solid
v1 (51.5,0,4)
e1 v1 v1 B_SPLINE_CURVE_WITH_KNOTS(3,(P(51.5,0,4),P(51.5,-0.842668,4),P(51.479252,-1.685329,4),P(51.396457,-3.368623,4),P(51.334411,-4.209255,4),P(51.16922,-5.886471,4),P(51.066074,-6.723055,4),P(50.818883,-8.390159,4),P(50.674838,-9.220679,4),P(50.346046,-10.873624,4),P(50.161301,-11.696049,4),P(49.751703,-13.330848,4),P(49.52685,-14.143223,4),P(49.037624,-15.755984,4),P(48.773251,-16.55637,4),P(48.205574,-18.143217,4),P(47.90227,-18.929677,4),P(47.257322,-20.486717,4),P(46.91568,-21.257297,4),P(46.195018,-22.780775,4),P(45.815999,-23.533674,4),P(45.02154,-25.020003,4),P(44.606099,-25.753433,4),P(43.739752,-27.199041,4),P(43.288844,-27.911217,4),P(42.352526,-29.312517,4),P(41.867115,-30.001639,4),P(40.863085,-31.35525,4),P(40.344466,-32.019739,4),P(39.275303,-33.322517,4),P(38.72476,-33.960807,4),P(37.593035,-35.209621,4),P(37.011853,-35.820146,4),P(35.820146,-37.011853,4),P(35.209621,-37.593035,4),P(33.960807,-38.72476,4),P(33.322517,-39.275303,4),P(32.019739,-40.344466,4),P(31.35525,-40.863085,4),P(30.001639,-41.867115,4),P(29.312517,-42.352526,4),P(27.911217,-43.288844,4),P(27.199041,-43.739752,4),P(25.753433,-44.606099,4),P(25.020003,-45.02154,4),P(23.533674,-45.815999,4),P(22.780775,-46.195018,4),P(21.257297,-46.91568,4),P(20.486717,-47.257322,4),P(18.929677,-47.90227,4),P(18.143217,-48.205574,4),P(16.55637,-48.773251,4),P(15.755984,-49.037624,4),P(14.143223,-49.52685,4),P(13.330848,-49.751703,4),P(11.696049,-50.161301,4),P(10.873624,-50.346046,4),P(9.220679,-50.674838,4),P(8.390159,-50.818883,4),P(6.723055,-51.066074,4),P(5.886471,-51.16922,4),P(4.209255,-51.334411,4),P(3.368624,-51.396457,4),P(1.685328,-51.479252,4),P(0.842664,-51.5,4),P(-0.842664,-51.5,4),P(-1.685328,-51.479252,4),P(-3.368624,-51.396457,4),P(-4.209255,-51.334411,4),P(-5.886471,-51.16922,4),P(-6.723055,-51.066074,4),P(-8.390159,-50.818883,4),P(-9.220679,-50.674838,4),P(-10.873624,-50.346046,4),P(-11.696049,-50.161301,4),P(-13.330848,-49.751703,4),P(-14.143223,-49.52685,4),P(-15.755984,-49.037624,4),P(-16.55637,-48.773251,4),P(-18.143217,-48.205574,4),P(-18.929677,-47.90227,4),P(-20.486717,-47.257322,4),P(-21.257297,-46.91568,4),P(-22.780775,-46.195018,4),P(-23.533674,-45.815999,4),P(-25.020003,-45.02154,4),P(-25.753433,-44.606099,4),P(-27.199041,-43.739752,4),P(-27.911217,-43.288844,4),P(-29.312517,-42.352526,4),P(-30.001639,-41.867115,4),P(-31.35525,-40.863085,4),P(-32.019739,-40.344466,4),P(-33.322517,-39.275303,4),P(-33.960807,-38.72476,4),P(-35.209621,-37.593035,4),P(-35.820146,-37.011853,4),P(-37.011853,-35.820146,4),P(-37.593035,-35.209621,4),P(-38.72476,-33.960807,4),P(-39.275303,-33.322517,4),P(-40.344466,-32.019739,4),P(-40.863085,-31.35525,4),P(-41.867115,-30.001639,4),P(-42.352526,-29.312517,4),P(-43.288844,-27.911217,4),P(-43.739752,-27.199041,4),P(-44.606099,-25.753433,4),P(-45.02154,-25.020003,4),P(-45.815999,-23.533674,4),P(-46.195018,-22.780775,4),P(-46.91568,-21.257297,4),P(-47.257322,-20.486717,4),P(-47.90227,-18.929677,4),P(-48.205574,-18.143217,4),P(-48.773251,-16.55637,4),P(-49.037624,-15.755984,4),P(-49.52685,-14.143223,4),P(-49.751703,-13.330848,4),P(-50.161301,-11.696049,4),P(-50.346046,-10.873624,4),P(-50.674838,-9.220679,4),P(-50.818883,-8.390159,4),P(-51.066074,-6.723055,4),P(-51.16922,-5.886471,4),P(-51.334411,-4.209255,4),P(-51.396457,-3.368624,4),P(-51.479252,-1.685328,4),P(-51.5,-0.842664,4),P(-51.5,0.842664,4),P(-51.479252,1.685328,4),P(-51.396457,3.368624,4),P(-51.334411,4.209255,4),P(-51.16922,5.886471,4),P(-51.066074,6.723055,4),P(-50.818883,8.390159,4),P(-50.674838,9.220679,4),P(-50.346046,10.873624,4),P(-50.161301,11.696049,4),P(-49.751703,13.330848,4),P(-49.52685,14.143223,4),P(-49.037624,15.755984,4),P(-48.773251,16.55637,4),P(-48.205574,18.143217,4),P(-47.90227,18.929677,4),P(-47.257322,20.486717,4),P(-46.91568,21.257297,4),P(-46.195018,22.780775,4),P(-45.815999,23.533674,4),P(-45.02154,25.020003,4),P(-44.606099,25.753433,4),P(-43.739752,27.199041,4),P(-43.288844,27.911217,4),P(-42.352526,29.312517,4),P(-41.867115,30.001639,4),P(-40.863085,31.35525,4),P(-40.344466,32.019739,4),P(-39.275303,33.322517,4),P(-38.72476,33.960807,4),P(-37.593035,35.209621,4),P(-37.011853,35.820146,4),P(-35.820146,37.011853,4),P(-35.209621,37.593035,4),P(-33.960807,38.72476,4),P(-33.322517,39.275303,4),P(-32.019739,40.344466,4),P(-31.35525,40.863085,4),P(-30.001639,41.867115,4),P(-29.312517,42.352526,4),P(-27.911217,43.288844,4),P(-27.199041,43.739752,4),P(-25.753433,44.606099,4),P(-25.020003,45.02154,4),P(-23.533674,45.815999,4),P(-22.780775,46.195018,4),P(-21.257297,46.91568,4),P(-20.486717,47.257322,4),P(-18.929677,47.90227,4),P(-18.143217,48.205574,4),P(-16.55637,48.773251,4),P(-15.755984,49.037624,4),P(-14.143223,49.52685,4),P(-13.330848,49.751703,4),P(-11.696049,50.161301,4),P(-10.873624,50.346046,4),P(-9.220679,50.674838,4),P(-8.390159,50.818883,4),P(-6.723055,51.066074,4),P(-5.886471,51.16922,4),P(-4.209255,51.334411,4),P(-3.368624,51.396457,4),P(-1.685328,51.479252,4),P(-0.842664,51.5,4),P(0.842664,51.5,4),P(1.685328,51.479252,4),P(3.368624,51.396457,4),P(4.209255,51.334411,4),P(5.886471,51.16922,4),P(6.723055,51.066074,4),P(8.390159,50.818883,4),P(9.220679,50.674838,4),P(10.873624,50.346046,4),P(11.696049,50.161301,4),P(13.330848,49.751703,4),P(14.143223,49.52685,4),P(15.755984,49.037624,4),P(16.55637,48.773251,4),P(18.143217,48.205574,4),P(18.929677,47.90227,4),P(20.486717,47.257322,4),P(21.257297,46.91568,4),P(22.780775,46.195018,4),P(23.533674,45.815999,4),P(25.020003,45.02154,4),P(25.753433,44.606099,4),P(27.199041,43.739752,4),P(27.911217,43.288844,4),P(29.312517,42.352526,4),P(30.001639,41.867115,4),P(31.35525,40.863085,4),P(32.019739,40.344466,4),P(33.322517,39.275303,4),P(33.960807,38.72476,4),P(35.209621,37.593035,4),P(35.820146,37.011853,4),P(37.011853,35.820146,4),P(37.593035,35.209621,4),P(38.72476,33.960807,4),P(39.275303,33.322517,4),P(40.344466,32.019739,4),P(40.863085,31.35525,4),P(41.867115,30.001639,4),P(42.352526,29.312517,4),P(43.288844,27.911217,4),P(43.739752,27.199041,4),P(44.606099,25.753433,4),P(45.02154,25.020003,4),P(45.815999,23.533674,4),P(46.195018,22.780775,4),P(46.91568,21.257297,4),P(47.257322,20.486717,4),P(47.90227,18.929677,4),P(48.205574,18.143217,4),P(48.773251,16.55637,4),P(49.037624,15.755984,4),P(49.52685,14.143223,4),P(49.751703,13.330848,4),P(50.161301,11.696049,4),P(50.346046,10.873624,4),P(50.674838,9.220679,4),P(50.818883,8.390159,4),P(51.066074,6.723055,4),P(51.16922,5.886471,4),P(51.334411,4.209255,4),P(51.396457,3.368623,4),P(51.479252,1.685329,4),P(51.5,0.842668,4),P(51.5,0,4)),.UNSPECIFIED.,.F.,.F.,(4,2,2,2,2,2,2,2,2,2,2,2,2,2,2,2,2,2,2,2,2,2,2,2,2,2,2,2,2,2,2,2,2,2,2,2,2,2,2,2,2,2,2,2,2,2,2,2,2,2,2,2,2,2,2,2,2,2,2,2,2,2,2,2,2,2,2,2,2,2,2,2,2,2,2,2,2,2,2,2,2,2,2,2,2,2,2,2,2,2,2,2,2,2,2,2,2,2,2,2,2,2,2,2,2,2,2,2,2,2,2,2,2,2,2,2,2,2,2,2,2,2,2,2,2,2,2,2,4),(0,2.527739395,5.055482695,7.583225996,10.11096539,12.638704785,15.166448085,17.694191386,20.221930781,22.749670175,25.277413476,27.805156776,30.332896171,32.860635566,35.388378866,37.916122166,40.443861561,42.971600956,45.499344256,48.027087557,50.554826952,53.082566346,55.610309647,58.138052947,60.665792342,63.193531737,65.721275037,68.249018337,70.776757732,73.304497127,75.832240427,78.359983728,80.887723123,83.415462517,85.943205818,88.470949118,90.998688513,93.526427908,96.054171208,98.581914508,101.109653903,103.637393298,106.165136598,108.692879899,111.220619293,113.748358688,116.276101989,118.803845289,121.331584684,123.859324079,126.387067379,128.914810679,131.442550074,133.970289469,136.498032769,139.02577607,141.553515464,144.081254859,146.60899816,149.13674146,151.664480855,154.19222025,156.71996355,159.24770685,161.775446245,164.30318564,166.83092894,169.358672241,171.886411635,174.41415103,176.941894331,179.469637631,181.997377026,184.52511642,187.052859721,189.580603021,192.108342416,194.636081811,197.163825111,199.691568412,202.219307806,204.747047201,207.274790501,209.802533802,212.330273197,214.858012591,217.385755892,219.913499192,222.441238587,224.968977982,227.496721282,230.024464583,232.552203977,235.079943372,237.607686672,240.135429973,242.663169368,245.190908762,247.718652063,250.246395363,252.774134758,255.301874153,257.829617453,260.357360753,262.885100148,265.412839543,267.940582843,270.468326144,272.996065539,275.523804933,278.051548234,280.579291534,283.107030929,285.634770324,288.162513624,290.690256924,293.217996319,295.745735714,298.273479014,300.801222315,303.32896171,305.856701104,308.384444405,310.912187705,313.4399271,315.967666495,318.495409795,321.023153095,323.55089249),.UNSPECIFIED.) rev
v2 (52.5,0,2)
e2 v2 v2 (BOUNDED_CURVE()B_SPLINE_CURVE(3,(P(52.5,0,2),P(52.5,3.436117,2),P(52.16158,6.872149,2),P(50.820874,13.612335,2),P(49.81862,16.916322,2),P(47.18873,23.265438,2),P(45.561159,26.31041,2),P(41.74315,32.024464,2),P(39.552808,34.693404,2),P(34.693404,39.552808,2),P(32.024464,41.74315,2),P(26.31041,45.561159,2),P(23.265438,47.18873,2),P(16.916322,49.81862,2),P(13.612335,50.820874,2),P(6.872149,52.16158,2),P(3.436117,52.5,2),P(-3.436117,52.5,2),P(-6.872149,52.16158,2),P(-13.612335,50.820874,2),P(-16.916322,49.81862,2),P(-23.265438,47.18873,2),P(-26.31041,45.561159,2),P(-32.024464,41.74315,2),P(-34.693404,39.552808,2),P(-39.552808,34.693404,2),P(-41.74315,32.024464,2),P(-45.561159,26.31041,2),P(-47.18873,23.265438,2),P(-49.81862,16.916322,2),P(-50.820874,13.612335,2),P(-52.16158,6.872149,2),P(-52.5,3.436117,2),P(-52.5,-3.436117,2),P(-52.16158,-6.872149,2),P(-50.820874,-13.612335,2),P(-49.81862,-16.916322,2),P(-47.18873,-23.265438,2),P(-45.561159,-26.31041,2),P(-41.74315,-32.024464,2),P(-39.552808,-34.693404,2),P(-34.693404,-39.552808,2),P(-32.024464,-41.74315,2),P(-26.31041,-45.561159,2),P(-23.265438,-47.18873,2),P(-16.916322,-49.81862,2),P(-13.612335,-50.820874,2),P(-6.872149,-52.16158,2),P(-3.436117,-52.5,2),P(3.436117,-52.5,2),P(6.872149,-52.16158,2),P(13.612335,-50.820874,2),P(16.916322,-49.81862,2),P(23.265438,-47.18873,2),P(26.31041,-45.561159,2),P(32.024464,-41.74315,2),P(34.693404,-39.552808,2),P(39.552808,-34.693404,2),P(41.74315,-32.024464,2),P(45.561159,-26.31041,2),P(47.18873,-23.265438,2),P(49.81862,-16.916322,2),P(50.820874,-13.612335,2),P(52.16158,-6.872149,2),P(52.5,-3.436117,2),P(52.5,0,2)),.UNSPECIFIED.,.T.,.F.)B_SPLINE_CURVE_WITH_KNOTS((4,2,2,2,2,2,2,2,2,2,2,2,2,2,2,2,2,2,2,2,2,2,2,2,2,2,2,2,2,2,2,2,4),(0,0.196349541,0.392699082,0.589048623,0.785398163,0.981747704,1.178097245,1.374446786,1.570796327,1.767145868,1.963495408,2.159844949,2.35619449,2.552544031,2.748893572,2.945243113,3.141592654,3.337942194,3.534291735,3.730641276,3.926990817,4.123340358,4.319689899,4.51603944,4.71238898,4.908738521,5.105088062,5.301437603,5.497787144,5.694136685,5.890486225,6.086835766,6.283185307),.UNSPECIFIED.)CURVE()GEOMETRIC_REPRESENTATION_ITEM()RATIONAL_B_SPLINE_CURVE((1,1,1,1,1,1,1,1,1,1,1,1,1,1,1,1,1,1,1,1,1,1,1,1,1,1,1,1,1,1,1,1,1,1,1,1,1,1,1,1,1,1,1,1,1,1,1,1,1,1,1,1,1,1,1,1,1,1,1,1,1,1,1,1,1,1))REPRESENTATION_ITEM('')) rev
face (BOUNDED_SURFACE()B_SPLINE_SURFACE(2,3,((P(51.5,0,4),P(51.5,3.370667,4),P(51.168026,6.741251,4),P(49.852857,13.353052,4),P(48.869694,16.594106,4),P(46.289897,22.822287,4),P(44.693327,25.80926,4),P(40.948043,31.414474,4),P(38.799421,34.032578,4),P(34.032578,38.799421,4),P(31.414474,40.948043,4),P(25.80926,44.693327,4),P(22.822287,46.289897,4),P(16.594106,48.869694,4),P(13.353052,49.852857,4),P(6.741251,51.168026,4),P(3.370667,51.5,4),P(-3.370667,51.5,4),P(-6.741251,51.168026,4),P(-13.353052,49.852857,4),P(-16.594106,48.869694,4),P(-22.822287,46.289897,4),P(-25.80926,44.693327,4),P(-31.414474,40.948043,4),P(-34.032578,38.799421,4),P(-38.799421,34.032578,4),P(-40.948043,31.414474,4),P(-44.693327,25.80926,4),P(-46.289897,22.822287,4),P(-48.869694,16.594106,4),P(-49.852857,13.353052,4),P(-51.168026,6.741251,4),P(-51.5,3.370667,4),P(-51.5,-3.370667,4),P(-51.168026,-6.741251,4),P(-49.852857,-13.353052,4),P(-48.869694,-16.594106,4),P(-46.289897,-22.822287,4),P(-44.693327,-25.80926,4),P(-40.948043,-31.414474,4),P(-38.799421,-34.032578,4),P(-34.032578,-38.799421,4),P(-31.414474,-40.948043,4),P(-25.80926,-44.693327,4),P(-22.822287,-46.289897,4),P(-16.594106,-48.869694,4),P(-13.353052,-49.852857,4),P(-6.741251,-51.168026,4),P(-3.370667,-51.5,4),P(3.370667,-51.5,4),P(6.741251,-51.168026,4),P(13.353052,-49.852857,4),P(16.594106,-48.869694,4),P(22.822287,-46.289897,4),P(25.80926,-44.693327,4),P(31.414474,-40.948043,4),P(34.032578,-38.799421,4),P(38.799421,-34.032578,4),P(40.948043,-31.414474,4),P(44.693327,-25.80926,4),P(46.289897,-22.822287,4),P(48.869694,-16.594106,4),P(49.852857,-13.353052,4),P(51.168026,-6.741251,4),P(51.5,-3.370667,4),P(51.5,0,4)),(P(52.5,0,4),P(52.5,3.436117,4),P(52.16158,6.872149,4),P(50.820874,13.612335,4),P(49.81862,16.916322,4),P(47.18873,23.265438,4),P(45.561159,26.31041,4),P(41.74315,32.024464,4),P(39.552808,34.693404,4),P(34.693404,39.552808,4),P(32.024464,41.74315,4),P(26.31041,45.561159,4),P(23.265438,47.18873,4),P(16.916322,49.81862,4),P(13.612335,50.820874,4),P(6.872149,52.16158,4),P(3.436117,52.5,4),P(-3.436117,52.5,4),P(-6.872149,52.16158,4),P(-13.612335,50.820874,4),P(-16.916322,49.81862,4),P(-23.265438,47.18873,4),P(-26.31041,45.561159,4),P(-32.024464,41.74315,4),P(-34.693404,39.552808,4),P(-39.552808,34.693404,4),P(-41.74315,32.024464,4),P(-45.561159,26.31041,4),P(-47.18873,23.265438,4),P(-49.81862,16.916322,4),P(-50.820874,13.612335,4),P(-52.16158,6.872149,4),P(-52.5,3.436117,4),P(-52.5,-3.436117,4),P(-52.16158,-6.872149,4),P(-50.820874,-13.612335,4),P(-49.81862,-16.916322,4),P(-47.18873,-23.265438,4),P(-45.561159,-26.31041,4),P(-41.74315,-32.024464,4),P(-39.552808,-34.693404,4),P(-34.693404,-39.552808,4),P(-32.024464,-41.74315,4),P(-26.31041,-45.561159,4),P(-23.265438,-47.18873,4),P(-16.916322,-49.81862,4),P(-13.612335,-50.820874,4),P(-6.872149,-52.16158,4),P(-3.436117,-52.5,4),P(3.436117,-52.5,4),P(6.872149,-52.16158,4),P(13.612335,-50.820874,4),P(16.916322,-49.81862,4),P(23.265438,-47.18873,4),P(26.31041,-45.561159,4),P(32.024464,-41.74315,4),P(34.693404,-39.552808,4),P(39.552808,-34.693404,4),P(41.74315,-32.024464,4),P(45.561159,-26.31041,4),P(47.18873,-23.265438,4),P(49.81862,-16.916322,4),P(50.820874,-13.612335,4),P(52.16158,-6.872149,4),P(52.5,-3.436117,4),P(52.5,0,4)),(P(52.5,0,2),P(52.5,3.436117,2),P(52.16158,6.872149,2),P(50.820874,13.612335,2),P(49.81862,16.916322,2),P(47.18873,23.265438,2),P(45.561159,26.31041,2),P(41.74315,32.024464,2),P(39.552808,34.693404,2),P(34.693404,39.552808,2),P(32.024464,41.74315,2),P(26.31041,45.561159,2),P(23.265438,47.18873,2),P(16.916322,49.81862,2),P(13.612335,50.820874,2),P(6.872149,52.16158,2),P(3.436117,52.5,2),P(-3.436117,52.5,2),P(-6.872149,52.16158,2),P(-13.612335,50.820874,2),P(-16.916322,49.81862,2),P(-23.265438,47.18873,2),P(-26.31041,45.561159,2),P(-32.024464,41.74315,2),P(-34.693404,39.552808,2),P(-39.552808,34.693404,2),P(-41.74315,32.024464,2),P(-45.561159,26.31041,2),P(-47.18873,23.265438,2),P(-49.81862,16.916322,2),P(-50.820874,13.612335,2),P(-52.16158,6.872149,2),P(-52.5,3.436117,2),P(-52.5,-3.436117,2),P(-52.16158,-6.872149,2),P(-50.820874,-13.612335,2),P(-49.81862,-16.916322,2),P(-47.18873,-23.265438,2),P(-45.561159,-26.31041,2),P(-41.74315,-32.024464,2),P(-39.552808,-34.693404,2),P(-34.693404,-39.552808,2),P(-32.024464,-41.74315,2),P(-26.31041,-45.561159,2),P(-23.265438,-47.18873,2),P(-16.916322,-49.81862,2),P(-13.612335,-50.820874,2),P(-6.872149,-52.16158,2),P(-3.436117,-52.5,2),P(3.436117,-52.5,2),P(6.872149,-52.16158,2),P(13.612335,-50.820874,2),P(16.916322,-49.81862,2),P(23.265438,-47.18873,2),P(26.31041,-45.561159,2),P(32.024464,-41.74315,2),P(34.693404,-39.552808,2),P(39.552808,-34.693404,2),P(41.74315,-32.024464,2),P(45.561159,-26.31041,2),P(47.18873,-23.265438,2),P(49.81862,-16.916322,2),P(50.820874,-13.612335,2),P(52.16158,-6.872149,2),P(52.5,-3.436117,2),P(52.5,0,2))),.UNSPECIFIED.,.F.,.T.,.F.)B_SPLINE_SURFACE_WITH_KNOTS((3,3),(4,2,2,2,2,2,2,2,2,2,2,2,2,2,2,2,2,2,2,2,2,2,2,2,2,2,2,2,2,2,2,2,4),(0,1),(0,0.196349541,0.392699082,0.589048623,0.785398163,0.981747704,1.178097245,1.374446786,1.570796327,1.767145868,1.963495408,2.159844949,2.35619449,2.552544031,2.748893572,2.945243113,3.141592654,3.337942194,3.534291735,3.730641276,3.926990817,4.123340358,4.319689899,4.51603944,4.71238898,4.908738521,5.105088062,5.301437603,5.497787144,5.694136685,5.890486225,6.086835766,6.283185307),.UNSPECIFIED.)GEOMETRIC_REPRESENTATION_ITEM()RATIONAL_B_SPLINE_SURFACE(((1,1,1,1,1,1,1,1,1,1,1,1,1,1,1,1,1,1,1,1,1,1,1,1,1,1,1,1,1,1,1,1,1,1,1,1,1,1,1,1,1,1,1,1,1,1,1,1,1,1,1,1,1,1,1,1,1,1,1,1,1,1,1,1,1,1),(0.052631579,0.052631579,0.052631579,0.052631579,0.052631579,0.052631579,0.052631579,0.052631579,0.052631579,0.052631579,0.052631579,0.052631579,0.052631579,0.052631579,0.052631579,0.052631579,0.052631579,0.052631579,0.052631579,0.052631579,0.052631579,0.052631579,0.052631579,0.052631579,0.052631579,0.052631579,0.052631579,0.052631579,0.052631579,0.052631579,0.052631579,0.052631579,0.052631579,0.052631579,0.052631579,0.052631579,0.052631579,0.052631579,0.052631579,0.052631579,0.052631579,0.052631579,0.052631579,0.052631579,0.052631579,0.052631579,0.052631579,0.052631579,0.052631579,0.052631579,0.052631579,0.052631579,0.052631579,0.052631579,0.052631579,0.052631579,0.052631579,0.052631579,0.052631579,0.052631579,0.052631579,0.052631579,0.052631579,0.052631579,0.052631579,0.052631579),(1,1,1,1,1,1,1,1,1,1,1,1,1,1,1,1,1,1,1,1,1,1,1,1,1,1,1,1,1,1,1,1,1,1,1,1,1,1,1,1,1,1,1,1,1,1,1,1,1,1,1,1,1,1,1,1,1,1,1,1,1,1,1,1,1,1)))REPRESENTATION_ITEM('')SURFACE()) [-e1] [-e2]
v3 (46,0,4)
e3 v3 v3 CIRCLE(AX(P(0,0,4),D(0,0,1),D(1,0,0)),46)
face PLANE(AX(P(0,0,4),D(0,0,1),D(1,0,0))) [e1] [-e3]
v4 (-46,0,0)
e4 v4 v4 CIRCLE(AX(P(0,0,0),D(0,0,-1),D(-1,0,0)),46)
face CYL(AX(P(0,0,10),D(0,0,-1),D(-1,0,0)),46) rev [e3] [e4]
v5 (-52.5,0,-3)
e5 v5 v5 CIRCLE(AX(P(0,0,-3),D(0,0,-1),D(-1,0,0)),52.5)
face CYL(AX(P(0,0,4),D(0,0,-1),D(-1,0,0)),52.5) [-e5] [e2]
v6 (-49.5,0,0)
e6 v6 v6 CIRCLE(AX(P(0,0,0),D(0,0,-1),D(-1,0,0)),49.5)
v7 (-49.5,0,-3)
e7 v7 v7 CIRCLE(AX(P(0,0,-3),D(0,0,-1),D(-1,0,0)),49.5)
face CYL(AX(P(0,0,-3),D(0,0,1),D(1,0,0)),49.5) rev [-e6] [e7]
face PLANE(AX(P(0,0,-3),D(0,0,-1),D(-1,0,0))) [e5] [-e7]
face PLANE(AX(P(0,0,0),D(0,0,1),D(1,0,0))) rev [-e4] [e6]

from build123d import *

# Parameters (mm, degrees)
SKETCH3_R           = 52.5
BOSS_EXTRUDE2_DEPTH = 4
BOSS_EXTRUDE3_START = 3
SKETCH4_R           = 52.5
SKETCH4_R_2         = 49.5
BOSS_EXTRUDE3_DEPTH = 3
SKETCH5_R           = 46
CUT_EXTRUDE1_DEPTH  = 10
FILLET1_SIZE        = 2
FILLET1_SIZE_2      = 1


with BuildPart() as part:
    # Sketch3 → Boss-Extrude2 (new body)
    with BuildSketch(Plane.XY):
        Circle(SKETCH3_R)
    extrude(amount=BOSS_EXTRUDE2_DEPTH)

    # Sketch4 → Boss-Extrude3 (add)
    with BuildSketch(Plane(origin=(0, 0, 0), x_dir=(-1, 0, 0), z_dir=(0, 0, -1)).offset(BOSS_EXTRUDE3_START)):
        Circle(SKETCH4_R)
        Circle(SKETCH4_R_2, mode=Mode.SUBTRACT)
    extrude(amount=-BOSS_EXTRUDE3_DEPTH)

    # Sketch5 → Cut-Extrude1 (cut)
    with BuildSketch(Plane(origin=(0, 0, 0), x_dir=(-1, 0, 0), z_dir=(0, 0, -1))):
        Circle(SKETCH5_R)
    extrude(amount=-CUT_EXTRUDE1_DEPTH, mode=Mode.SUBTRACT)

    # Fillet1
    # a fillet whose section is not a circle: 2, 1 mm, written as the material it takes off along each edge
    with BuildSketch(Plane(origin=(0, 0, 4), x_dir=(1, 0, 0), z_dir=(0, -1, 0))) as fillet1_piece_1:
        with BuildLine():
            Bezier((52.5, -FILLET1_SIZE), (52.5, 0), (52.5 - FILLET1_SIZE_2, 0), weights=[1, 0.052631579, 1])
            Line((52.5 - FILLET1_SIZE_2, 0), (51.5, 0.04))
            Line((51.5, 0.04), (52.54, 0.04))
            Line((52.54, 0.04), (52.54, -2))
            Line((52.54, -2), (52.5, -FILLET1_SIZE))
        make_face()
    revolve(axis=Axis((0, 0, 4), (0, 0, 1)), mode=Mode.SUBTRACT)


solid = part.part
